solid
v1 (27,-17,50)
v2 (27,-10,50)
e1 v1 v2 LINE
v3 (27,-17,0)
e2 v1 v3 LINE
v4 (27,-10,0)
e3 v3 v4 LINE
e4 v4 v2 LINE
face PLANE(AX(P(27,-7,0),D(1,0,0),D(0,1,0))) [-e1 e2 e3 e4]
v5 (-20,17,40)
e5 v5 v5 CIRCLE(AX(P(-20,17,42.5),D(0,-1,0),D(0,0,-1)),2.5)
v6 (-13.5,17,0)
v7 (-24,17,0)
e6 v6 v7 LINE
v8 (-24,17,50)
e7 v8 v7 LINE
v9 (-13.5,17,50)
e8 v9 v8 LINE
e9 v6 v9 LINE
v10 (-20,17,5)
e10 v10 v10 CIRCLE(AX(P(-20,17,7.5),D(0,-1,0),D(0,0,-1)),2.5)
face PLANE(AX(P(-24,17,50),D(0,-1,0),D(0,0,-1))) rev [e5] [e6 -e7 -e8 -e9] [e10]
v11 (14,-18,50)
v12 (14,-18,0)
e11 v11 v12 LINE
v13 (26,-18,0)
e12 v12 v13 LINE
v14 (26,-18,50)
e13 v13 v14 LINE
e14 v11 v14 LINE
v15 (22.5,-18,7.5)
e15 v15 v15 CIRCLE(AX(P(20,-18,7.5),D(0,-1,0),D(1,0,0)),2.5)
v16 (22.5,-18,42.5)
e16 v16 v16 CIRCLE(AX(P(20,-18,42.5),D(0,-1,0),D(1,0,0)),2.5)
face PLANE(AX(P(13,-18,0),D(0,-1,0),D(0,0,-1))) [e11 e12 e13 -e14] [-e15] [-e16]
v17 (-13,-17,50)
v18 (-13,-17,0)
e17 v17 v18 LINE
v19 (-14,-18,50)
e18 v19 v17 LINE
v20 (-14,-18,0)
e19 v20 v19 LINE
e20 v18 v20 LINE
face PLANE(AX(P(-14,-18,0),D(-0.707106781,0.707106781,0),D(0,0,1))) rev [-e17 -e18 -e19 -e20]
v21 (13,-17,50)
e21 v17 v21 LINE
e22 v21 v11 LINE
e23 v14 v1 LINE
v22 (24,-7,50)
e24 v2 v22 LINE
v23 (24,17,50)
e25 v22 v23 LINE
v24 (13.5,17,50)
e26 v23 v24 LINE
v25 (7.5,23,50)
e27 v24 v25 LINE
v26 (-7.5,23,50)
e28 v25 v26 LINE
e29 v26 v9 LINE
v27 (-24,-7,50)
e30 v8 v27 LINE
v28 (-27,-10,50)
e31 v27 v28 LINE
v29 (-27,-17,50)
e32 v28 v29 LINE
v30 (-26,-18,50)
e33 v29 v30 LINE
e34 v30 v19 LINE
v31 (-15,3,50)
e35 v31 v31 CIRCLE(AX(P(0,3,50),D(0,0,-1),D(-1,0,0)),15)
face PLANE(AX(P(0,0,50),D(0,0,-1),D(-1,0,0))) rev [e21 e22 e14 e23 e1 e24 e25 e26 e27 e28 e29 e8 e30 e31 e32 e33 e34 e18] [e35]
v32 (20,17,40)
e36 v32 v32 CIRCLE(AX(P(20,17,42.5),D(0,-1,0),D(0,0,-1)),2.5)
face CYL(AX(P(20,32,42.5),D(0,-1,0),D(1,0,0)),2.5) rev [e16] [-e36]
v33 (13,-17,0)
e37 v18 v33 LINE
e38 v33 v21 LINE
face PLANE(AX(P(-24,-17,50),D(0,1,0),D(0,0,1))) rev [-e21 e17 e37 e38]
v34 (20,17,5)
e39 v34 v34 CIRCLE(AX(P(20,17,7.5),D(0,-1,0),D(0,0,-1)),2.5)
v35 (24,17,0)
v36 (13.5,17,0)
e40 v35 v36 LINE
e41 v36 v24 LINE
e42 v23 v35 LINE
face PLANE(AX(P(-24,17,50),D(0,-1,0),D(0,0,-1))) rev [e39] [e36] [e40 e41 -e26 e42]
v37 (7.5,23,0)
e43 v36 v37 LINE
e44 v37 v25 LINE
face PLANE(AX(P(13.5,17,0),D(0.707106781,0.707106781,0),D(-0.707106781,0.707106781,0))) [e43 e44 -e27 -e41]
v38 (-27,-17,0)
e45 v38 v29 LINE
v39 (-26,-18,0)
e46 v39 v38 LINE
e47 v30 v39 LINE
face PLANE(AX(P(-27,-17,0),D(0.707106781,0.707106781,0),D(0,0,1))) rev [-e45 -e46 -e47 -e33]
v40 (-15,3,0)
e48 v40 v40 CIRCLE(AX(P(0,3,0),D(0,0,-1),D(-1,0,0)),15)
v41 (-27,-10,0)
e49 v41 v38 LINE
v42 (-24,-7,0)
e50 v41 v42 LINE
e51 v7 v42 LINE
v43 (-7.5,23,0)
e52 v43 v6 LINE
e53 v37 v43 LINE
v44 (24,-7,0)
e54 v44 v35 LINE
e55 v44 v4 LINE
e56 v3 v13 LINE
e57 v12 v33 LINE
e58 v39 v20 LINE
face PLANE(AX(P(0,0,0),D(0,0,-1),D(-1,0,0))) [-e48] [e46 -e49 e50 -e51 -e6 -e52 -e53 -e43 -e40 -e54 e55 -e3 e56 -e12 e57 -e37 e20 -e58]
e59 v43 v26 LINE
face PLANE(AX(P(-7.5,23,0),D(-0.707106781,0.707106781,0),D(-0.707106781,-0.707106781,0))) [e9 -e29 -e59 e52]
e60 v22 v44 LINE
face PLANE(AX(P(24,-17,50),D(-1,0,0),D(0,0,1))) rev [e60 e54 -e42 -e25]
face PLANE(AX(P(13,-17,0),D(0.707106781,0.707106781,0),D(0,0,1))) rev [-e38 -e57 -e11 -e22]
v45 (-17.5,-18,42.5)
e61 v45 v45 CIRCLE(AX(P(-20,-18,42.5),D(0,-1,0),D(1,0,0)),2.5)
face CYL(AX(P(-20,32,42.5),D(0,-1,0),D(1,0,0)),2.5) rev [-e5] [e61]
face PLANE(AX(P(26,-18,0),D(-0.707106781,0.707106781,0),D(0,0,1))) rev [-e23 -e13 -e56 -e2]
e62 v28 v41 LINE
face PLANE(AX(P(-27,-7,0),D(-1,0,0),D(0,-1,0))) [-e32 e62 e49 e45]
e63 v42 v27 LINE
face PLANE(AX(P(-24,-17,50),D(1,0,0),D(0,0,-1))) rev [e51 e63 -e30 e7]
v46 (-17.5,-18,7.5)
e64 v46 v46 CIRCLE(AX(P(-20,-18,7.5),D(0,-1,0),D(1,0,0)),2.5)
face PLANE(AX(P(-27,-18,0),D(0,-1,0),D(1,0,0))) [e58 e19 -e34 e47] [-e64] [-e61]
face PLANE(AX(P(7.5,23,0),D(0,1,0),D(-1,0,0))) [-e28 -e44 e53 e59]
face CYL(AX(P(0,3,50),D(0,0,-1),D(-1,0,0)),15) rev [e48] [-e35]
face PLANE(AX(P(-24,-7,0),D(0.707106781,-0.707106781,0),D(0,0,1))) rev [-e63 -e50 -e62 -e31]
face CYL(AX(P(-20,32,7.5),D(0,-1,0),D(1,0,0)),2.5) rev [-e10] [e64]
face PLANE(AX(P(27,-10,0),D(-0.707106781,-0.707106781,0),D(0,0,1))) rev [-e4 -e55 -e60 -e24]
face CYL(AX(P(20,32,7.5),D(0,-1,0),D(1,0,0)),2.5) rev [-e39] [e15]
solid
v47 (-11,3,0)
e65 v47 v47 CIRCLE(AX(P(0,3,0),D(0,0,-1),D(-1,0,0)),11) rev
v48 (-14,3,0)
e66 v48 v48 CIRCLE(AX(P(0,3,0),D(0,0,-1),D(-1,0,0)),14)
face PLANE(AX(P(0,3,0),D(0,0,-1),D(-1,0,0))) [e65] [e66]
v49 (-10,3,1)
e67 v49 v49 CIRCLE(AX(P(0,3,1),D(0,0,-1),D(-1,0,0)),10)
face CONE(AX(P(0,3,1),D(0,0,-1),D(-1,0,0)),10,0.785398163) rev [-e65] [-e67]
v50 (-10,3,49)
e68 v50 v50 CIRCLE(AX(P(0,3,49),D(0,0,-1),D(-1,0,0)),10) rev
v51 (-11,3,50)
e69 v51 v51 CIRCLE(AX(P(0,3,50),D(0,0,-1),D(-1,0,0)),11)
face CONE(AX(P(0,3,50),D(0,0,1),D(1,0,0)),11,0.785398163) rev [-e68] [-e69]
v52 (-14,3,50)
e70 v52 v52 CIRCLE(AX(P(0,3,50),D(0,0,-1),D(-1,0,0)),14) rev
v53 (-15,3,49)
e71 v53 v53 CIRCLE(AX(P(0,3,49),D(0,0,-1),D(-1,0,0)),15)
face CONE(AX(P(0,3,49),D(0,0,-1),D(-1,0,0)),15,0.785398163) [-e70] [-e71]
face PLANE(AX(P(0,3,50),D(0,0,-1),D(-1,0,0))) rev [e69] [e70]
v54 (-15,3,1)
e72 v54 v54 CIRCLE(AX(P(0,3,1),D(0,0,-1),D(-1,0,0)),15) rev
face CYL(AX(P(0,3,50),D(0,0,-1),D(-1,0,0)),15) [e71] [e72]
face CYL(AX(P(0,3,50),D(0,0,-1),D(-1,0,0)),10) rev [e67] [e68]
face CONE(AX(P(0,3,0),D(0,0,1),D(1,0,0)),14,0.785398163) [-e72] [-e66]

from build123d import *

# Parameters (mm, degrees)
IZIM1_W                     = 48
IZIM1_H                     = 34
Y_KSEKLIK_EKSTR_ZYON1_DEPTH = 50
IZIM2_W                     = 14
IZIM2_H                     = 11
Y_KSEKLIK_EKSTR_ZYON2_DEPTH = 50
IZIM3_R                     = 15
KES_EKSTR_ZYON1_DEPTH       = 50
IZIM4_R                     = 15
IZIM4_R_2                   = 10
Y_KSEKLIK_EKSTR_ZYON3_DEPTH = 50
IZIM5_R                     = 2.5
KES_EKSTR_ZYON2_DEPTH       = 50
PAH1_SIZE                   = 1
PAH2_SIZE                   = 3
PAH3_SIZE                   = 1


with BuildPart() as part:
    # Çizim1 → Yükseklik-Ekstrüzyon1 (new body)
    with BuildSketch(Plane.XY):
        Rectangle(IZIM1_W, IZIM1_H)
    extrude(amount=Y_KSEKLIK_EKSTR_ZYON1_DEPTH)

    # Çizim2 → Yükseklik-Ekstrüzyon2 (add)
    with BuildSketch(Plane.XY.offset(50)):
        with Locations((-20, -12.5)):
            Rectangle(IZIM2_W, IZIM2_H)
        with Locations((20, -12.5)):
            Rectangle(IZIM2_W, IZIM2_H)
        Polygon((-13.5, 17), (13.5, 17), (7.5, 23), (-7.5, 23), align=None)
    extrude(amount=-Y_KSEKLIK_EKSTR_ZYON2_DEPTH)

    # Çizim3 → Kes-Ekstrüzyon1 (cut)
    with BuildSketch(Plane(origin=(0, 0, 0), x_dir=(-1, 0, 0), z_dir=(0, 0, -1))):
        with Locations((0, 3)):
            Circle(IZIM3_R)
    extrude(amount=-KES_EKSTR_ZYON1_DEPTH, mode=Mode.SUBTRACT)

    # Çizim5 → Kes-Ekstrüzyon2 (cut)
    with BuildSketch(Plane.XZ.offset(18)):
        with Locations((-20, 42.5)):
            Circle(IZIM5_R)
        with Locations((-20, 7.5)):
            Circle(IZIM5_R)
        with Locations((20, 7.5)):
            Circle(IZIM5_R)
        with Locations((20, 42.5)):
            Circle(IZIM5_R)
    extrude(amount=-KES_EKSTR_ZYON2_DEPTH, mode=Mode.SUBTRACT)

    # Pah1
    pah1_edges = [part.edges().sort_by_distance(p)[0] for p in [
        (-27, -18, 25),
        (27, -18, 25),
        (13, -18, 25),
        (-13, -18, 25),
    ]]
    chamfer(pah1_edges, length=PAH1_SIZE - 0.0001)  # a hair under: the kernel refuses the full size

    # Pah2
    pah2_edges = [part.edges().sort_by_distance(p)[0] for p in [
        (-27, -7, 25),
        (27, -7, 25),
    ]]
    chamfer(pah2_edges, length=PAH2_SIZE - 0.0001)  # a hair under: the kernel refuses the full size


with BuildPart() as body_2:
    # Çizim4 → Yükseklik-Ekstrüzyon3 (new body)
    with BuildSketch(Plane(origin=(0, 0, 0), x_dir=(-1, 0, 0), z_dir=(0, 0, -1))):
        with Locations((0, 3)):
            Circle(IZIM4_R)
        with Locations((0, 3)):
            Circle(IZIM4_R_2, mode=Mode.SUBTRACT)
    extrude(amount=-Y_KSEKLIK_EKSTR_ZYON3_DEPTH)

    # Pah3
    pah3_edges = [body_2.edges().sort_by_distance(p)[0] for p in [
        (15, 3, 0),
        (15, 3, 50),
        (10, 3, 50),
        (10, 3, 0),
    ]]
    chamfer(pah3_edges, length=PAH3_SIZE)


solid = Compound([part.part, body_2.part])
